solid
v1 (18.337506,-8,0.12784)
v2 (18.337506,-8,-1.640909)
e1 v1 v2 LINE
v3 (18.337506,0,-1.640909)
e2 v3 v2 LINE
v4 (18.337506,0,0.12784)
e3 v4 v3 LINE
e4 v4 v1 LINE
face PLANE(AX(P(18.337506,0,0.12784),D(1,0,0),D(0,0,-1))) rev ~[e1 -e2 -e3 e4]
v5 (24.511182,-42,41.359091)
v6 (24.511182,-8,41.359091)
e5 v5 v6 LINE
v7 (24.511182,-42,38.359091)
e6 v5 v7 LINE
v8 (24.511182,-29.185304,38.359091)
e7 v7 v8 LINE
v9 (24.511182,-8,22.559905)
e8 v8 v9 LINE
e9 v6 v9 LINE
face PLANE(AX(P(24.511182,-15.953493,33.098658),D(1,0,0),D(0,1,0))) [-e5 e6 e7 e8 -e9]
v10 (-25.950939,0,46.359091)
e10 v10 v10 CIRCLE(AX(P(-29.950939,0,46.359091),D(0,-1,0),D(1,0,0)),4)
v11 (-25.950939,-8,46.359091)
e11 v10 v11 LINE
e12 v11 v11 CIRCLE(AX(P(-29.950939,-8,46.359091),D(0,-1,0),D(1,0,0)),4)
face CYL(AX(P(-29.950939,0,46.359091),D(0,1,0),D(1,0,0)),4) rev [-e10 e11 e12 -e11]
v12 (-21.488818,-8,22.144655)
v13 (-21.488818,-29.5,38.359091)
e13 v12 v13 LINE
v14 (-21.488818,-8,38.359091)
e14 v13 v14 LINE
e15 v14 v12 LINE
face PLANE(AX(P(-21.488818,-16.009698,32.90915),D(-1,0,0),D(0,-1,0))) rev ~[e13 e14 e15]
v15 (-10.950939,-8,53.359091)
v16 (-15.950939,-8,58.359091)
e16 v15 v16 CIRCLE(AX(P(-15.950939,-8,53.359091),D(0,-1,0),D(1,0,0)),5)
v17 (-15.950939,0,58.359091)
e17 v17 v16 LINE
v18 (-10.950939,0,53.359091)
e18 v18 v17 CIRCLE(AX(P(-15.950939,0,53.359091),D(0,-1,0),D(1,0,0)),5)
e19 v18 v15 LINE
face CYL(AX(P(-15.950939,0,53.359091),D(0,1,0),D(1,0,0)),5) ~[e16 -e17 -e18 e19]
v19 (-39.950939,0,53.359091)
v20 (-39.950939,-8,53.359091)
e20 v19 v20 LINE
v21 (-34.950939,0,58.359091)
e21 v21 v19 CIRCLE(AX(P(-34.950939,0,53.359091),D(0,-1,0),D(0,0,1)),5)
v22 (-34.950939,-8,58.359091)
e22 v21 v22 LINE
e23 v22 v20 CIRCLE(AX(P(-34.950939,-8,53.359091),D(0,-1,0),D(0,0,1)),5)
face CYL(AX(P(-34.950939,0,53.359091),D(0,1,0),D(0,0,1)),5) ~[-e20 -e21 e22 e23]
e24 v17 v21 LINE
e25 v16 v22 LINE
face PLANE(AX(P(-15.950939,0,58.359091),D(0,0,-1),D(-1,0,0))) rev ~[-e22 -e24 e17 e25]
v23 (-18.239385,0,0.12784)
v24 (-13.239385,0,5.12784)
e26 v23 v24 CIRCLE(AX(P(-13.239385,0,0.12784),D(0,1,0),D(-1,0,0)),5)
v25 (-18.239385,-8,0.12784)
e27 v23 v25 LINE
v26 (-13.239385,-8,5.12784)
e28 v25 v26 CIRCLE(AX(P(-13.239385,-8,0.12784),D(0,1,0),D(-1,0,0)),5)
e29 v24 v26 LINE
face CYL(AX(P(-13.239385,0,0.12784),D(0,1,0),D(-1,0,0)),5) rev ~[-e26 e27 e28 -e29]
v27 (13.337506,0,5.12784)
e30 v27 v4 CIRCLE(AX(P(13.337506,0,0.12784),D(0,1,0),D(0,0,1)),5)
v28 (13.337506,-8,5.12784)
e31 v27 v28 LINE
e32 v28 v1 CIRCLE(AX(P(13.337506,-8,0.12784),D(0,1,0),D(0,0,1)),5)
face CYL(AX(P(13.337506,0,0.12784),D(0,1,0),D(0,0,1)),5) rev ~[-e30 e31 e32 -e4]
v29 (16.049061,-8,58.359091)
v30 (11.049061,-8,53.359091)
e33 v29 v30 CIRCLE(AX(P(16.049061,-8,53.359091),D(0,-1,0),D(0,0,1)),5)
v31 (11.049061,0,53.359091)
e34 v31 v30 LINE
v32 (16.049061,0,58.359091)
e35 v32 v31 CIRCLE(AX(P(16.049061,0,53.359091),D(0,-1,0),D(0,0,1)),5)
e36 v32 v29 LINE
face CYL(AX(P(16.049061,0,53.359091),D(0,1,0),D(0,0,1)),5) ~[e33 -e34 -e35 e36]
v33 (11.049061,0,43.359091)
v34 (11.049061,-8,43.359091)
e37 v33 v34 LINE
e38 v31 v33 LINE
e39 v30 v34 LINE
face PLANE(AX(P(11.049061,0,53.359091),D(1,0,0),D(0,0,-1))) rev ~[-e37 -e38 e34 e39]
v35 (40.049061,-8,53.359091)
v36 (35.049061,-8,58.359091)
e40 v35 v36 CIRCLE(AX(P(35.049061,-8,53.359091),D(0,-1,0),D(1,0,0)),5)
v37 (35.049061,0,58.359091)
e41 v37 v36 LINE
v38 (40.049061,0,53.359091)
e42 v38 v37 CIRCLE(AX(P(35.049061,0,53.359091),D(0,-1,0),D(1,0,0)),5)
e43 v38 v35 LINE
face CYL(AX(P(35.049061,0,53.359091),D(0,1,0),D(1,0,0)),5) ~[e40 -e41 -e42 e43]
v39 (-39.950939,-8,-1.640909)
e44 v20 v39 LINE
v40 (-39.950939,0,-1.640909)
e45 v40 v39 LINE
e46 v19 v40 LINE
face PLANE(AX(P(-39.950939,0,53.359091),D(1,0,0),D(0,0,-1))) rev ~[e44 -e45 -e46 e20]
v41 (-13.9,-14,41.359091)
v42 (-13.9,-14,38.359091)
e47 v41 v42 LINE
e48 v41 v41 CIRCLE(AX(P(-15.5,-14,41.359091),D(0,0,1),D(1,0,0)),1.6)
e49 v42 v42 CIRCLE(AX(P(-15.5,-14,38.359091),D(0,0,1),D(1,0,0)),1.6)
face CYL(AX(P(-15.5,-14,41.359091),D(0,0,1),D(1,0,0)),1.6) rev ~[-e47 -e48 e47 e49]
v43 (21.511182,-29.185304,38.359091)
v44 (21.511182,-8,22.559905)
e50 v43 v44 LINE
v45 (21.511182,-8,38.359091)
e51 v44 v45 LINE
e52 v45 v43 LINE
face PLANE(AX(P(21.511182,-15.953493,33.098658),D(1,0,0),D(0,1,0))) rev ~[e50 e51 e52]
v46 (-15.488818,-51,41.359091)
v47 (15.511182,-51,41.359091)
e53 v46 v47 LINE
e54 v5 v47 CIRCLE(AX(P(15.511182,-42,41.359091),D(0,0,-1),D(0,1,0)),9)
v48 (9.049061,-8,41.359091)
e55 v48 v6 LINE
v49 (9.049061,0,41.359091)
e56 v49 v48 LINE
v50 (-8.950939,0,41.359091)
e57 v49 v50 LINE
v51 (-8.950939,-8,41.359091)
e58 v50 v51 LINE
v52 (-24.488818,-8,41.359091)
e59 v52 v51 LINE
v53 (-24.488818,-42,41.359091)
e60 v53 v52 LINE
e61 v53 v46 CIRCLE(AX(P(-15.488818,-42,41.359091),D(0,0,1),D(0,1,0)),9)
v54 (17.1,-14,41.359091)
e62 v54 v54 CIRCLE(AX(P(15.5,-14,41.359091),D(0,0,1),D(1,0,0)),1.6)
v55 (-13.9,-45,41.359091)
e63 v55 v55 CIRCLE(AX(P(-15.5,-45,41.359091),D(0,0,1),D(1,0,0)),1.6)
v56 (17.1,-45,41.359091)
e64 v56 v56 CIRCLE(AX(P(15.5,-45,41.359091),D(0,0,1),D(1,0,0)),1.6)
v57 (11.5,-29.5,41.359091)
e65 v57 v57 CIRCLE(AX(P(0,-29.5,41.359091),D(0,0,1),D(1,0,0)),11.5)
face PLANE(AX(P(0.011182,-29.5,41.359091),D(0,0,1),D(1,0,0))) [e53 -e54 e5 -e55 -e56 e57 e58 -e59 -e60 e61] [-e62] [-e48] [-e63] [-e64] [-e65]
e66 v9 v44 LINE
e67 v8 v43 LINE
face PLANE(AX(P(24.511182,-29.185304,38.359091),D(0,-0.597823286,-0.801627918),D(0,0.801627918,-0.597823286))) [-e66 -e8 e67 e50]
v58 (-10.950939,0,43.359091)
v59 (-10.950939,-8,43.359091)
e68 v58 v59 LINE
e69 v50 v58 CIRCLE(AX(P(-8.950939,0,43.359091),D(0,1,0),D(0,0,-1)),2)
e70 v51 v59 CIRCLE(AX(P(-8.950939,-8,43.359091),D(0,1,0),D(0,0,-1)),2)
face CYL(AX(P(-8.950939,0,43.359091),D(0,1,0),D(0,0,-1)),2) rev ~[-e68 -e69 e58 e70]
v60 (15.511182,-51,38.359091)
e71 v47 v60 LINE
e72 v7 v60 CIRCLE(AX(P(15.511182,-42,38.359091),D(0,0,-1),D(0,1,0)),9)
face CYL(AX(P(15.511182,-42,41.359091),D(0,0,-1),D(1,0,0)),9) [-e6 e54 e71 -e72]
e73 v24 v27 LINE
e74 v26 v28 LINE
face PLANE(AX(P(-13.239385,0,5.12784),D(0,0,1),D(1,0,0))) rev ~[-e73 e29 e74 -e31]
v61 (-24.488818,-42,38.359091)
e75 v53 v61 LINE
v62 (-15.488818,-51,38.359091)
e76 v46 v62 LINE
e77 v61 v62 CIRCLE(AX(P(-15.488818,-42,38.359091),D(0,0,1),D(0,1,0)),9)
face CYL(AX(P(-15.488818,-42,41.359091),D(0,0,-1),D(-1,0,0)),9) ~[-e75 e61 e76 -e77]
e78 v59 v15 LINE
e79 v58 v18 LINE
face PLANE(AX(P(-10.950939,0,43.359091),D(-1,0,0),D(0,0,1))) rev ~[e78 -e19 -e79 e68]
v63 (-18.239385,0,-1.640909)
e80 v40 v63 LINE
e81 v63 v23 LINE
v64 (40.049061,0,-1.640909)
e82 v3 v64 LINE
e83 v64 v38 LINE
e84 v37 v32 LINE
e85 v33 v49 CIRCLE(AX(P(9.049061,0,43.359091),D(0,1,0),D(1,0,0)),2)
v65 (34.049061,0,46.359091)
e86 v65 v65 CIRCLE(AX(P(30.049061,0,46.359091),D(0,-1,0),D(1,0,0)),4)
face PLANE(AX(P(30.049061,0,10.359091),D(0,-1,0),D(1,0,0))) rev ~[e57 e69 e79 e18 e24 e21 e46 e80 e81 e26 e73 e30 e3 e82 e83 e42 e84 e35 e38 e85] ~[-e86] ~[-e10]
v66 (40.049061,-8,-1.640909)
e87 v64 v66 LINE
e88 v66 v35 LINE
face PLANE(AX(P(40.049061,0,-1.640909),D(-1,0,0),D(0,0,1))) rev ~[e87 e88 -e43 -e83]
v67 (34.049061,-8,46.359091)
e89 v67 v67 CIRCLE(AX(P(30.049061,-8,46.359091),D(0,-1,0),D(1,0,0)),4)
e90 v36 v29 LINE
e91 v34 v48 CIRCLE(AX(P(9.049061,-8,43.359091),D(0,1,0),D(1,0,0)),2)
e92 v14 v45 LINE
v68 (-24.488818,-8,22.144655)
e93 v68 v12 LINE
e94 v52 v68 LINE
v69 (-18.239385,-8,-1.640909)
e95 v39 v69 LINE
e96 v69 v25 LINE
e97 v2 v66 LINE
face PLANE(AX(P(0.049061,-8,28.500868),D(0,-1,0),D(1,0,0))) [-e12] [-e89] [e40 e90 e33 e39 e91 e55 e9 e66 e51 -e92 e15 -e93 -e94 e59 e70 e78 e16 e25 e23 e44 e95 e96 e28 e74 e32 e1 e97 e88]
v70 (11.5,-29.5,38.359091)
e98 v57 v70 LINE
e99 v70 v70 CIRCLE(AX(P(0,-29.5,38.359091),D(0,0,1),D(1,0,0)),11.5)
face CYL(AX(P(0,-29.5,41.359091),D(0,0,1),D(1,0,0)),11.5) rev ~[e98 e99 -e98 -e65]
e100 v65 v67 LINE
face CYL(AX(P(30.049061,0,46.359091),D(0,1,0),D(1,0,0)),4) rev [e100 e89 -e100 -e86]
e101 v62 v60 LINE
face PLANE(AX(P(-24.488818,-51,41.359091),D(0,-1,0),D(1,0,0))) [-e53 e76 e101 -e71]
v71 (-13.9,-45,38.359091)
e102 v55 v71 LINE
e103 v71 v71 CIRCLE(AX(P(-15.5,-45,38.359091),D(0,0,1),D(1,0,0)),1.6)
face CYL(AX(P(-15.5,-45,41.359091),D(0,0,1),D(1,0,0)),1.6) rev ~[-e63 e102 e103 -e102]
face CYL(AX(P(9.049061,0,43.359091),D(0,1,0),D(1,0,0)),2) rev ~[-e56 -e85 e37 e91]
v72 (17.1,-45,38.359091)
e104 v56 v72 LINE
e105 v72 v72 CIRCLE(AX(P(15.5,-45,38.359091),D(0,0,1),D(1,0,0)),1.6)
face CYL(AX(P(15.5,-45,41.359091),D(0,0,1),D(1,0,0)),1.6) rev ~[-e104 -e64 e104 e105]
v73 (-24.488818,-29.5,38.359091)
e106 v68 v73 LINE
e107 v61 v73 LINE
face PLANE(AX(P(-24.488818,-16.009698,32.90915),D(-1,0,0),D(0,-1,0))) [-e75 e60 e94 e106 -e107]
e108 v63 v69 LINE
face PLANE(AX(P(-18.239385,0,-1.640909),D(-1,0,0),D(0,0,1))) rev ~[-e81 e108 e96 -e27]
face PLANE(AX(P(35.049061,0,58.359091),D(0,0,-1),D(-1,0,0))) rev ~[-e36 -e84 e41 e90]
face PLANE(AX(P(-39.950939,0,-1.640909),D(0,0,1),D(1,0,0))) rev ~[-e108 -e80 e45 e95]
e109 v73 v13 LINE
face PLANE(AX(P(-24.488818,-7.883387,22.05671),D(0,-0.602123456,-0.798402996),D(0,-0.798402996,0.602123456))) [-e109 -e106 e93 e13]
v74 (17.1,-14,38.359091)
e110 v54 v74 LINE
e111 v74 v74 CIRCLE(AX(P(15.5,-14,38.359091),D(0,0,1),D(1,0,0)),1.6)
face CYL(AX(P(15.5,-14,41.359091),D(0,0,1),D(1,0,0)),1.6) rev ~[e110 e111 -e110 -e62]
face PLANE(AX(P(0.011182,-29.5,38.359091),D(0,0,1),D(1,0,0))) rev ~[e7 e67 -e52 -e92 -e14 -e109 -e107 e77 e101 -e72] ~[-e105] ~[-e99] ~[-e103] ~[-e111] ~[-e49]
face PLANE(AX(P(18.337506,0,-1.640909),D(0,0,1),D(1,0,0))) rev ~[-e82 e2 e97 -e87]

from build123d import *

# Parameters (mm, degrees)
F0_R     = 5
F0_R_2   = 4
F1_DEPTH = 8
F2_W     = 49
F2_H     = 43
F2_R     = 1.6
F2_R_2   = 11.5
F3_DEPTH = 3
F5_DEPTH = 3
F6_R     = 9
F8_DEPTH = 3
F9_DEPTH = 8


# Not quite as in the source:
# - a feature of the source that left no trace in its solid (it failed there, or was rolled back) is left out


with BuildPart() as f1:
    # F0 (on Front) → F1 (new body)
    with BuildSketch(Plane.XZ):
        with BuildLine():
            Line((-15.9509392173, 58.3590910856), (-34.9509392173, 58.3590910856))
            ThreePointArc((-34.9509392173, 58.3590910856), (-38.4864731233, 56.8946249915), (-39.9509392173, 53.3590910856))
            Line((-39.9509392173, 53.3590910856), (-39.9509392173, -1.6409089144))
            Line((-39.9509392173, -1.6409089144), (-18.2393845171, -1.6409089144))
            Line((-18.2393845171, -1.6409089144), (-18.2393845171, 0.1278397727))
            ThreePointArc((-18.2393845171, 0.1278397727), (-16.774918423, 3.6633736787), (-13.2393845171, 5.1278397727))
            Line((-13.2393845171, 5.1278397727), (13.3375060824, 5.1278397727))
            ThreePointArc((13.3375060824, 5.1278397727), (16.8730399883, 3.6633736787), (18.3375060824, 0.1278397727))
            Line((18.3375060824, 0.1278397727), (18.3375060824, -1.6409089144))
            Line((18.3375060824, -1.6409089144), (40.0490607827, -1.6409089144))
            Line((40.0490607827, -1.6409089144), (40.0490607827, 53.3590910856))
            ThreePointArc((40.0490607827, 53.3590910856), (38.5845946886, 56.8946249915), (35.0490607827, 58.3590910856))
            Line((35.0490607827, 58.3590910856), (16.0490607827, 58.3590910856))
            ThreePointArc((16.0490607827, 58.3590910856), (12.5135268767, 56.8946249915), (11.0490607827, 53.3590910856))
            Line((11.0490607827, 53.3590910856), (11.0490607827, 43.3590910856))
            ThreePointArc((11.0490607827, 43.3590910856), (10.463274345, 41.9448775232), (9.0490607827, 41.3590910856))
            Line((9.0490607827, 41.3590910856), (-8.9509392173, 41.3590910856))
            ThreePointArc((-8.9509392173, 41.3590910856), (-10.3651527797, 41.9448775232), (-10.9509392173, 43.3590910856))
            Line((-10.9509392173, 43.3590910856), (-10.9509392173, 53.3590910856))
            ThreePointArc((-10.9509392173, 53.3590910856), (-12.4154053114, 56.8946249915), (-15.9509392173, 58.3590910856))
        make_face()
        with Locations((-29.9509392173, 10.3590910856)):
            Circle(F0_R, mode=Mode.SUBTRACT)
        with Locations((30.0490607827, 10.3590910856)):
            Circle(F0_R, mode=Mode.SUBTRACT)
        with Locations((-29.9509392173, 46.3590910856)):
            Circle(F0_R_2, mode=Mode.SUBTRACT)
        with Locations((30.0490607827, 46.3590910856)):
            Circle(F0_R_2, mode=Mode.SUBTRACT)
    extrude(amount=F1_DEPTH)

    # F2 (on face) → F3 (join)
    with BuildSketch(Plane.XY.offset(41.3590910856)):
        with Locations((0.0111820996, -29.5)):
            Rectangle(F2_W, F2_H)
        with Locations((-15.5, -45)):
            Circle(F2_R, mode=Mode.SUBTRACT)
        with Locations((15.5, -45)):
            Circle(F2_R, mode=Mode.SUBTRACT)
        with Locations((0, -29.5)):
            Circle(F2_R_2, mode=Mode.SUBTRACT)
        with Locations((-15.5, -14)):
            Circle(F2_R, mode=Mode.SUBTRACT)
        with Locations((15.5, -14)):
            Circle(F2_R, mode=Mode.SUBTRACT)
    extrude(amount=-F3_DEPTH)

    # F4 (on face) → F5 (join)
    with BuildSketch(Plane(origin=(-24.4888179004, 0, 0), x_dir=(0, -1, 0), z_dir=(-1, 0, 0))):
        Polygon((29.5, 38.3590910856), (8, 38.3590910856), (7.8833866864, 22.056709975), align=None)
    extrude(amount=-F5_DEPTH)

    # F6
    f6_edges = [f1.edges().sort_by_distance(p)[0] for p in [
        (-24.488818, -51, 39.859091),
        (24.511182, -51, 39.859091),
    ]]
    fillet(f6_edges, radius=F6_R)

    # F7 (on face) → F8 (join)
    with BuildSketch(Plane.YZ.offset(24.5111820996)):
        Polygon((-8, 38.3590910856), (-29.1853044182, 38.3590910856), (-8, 22.5599054247), align=None)
    extrude(amount=-F8_DEPTH)

    # F0 (on Front) → F9 (join)
    with BuildSketch(Plane.XZ):
        with Locations((30.0490607827, 10.3590910856)):
            Circle(F0_R)
        with Locations((-29.9509392173, 10.3590910856)):
            Circle(F0_R)
    extrude(amount=F9_DEPTH)


with BuildPart() as f10_1:
    # F10: copy of F1
    add(f1.part)


solid = f1.part
